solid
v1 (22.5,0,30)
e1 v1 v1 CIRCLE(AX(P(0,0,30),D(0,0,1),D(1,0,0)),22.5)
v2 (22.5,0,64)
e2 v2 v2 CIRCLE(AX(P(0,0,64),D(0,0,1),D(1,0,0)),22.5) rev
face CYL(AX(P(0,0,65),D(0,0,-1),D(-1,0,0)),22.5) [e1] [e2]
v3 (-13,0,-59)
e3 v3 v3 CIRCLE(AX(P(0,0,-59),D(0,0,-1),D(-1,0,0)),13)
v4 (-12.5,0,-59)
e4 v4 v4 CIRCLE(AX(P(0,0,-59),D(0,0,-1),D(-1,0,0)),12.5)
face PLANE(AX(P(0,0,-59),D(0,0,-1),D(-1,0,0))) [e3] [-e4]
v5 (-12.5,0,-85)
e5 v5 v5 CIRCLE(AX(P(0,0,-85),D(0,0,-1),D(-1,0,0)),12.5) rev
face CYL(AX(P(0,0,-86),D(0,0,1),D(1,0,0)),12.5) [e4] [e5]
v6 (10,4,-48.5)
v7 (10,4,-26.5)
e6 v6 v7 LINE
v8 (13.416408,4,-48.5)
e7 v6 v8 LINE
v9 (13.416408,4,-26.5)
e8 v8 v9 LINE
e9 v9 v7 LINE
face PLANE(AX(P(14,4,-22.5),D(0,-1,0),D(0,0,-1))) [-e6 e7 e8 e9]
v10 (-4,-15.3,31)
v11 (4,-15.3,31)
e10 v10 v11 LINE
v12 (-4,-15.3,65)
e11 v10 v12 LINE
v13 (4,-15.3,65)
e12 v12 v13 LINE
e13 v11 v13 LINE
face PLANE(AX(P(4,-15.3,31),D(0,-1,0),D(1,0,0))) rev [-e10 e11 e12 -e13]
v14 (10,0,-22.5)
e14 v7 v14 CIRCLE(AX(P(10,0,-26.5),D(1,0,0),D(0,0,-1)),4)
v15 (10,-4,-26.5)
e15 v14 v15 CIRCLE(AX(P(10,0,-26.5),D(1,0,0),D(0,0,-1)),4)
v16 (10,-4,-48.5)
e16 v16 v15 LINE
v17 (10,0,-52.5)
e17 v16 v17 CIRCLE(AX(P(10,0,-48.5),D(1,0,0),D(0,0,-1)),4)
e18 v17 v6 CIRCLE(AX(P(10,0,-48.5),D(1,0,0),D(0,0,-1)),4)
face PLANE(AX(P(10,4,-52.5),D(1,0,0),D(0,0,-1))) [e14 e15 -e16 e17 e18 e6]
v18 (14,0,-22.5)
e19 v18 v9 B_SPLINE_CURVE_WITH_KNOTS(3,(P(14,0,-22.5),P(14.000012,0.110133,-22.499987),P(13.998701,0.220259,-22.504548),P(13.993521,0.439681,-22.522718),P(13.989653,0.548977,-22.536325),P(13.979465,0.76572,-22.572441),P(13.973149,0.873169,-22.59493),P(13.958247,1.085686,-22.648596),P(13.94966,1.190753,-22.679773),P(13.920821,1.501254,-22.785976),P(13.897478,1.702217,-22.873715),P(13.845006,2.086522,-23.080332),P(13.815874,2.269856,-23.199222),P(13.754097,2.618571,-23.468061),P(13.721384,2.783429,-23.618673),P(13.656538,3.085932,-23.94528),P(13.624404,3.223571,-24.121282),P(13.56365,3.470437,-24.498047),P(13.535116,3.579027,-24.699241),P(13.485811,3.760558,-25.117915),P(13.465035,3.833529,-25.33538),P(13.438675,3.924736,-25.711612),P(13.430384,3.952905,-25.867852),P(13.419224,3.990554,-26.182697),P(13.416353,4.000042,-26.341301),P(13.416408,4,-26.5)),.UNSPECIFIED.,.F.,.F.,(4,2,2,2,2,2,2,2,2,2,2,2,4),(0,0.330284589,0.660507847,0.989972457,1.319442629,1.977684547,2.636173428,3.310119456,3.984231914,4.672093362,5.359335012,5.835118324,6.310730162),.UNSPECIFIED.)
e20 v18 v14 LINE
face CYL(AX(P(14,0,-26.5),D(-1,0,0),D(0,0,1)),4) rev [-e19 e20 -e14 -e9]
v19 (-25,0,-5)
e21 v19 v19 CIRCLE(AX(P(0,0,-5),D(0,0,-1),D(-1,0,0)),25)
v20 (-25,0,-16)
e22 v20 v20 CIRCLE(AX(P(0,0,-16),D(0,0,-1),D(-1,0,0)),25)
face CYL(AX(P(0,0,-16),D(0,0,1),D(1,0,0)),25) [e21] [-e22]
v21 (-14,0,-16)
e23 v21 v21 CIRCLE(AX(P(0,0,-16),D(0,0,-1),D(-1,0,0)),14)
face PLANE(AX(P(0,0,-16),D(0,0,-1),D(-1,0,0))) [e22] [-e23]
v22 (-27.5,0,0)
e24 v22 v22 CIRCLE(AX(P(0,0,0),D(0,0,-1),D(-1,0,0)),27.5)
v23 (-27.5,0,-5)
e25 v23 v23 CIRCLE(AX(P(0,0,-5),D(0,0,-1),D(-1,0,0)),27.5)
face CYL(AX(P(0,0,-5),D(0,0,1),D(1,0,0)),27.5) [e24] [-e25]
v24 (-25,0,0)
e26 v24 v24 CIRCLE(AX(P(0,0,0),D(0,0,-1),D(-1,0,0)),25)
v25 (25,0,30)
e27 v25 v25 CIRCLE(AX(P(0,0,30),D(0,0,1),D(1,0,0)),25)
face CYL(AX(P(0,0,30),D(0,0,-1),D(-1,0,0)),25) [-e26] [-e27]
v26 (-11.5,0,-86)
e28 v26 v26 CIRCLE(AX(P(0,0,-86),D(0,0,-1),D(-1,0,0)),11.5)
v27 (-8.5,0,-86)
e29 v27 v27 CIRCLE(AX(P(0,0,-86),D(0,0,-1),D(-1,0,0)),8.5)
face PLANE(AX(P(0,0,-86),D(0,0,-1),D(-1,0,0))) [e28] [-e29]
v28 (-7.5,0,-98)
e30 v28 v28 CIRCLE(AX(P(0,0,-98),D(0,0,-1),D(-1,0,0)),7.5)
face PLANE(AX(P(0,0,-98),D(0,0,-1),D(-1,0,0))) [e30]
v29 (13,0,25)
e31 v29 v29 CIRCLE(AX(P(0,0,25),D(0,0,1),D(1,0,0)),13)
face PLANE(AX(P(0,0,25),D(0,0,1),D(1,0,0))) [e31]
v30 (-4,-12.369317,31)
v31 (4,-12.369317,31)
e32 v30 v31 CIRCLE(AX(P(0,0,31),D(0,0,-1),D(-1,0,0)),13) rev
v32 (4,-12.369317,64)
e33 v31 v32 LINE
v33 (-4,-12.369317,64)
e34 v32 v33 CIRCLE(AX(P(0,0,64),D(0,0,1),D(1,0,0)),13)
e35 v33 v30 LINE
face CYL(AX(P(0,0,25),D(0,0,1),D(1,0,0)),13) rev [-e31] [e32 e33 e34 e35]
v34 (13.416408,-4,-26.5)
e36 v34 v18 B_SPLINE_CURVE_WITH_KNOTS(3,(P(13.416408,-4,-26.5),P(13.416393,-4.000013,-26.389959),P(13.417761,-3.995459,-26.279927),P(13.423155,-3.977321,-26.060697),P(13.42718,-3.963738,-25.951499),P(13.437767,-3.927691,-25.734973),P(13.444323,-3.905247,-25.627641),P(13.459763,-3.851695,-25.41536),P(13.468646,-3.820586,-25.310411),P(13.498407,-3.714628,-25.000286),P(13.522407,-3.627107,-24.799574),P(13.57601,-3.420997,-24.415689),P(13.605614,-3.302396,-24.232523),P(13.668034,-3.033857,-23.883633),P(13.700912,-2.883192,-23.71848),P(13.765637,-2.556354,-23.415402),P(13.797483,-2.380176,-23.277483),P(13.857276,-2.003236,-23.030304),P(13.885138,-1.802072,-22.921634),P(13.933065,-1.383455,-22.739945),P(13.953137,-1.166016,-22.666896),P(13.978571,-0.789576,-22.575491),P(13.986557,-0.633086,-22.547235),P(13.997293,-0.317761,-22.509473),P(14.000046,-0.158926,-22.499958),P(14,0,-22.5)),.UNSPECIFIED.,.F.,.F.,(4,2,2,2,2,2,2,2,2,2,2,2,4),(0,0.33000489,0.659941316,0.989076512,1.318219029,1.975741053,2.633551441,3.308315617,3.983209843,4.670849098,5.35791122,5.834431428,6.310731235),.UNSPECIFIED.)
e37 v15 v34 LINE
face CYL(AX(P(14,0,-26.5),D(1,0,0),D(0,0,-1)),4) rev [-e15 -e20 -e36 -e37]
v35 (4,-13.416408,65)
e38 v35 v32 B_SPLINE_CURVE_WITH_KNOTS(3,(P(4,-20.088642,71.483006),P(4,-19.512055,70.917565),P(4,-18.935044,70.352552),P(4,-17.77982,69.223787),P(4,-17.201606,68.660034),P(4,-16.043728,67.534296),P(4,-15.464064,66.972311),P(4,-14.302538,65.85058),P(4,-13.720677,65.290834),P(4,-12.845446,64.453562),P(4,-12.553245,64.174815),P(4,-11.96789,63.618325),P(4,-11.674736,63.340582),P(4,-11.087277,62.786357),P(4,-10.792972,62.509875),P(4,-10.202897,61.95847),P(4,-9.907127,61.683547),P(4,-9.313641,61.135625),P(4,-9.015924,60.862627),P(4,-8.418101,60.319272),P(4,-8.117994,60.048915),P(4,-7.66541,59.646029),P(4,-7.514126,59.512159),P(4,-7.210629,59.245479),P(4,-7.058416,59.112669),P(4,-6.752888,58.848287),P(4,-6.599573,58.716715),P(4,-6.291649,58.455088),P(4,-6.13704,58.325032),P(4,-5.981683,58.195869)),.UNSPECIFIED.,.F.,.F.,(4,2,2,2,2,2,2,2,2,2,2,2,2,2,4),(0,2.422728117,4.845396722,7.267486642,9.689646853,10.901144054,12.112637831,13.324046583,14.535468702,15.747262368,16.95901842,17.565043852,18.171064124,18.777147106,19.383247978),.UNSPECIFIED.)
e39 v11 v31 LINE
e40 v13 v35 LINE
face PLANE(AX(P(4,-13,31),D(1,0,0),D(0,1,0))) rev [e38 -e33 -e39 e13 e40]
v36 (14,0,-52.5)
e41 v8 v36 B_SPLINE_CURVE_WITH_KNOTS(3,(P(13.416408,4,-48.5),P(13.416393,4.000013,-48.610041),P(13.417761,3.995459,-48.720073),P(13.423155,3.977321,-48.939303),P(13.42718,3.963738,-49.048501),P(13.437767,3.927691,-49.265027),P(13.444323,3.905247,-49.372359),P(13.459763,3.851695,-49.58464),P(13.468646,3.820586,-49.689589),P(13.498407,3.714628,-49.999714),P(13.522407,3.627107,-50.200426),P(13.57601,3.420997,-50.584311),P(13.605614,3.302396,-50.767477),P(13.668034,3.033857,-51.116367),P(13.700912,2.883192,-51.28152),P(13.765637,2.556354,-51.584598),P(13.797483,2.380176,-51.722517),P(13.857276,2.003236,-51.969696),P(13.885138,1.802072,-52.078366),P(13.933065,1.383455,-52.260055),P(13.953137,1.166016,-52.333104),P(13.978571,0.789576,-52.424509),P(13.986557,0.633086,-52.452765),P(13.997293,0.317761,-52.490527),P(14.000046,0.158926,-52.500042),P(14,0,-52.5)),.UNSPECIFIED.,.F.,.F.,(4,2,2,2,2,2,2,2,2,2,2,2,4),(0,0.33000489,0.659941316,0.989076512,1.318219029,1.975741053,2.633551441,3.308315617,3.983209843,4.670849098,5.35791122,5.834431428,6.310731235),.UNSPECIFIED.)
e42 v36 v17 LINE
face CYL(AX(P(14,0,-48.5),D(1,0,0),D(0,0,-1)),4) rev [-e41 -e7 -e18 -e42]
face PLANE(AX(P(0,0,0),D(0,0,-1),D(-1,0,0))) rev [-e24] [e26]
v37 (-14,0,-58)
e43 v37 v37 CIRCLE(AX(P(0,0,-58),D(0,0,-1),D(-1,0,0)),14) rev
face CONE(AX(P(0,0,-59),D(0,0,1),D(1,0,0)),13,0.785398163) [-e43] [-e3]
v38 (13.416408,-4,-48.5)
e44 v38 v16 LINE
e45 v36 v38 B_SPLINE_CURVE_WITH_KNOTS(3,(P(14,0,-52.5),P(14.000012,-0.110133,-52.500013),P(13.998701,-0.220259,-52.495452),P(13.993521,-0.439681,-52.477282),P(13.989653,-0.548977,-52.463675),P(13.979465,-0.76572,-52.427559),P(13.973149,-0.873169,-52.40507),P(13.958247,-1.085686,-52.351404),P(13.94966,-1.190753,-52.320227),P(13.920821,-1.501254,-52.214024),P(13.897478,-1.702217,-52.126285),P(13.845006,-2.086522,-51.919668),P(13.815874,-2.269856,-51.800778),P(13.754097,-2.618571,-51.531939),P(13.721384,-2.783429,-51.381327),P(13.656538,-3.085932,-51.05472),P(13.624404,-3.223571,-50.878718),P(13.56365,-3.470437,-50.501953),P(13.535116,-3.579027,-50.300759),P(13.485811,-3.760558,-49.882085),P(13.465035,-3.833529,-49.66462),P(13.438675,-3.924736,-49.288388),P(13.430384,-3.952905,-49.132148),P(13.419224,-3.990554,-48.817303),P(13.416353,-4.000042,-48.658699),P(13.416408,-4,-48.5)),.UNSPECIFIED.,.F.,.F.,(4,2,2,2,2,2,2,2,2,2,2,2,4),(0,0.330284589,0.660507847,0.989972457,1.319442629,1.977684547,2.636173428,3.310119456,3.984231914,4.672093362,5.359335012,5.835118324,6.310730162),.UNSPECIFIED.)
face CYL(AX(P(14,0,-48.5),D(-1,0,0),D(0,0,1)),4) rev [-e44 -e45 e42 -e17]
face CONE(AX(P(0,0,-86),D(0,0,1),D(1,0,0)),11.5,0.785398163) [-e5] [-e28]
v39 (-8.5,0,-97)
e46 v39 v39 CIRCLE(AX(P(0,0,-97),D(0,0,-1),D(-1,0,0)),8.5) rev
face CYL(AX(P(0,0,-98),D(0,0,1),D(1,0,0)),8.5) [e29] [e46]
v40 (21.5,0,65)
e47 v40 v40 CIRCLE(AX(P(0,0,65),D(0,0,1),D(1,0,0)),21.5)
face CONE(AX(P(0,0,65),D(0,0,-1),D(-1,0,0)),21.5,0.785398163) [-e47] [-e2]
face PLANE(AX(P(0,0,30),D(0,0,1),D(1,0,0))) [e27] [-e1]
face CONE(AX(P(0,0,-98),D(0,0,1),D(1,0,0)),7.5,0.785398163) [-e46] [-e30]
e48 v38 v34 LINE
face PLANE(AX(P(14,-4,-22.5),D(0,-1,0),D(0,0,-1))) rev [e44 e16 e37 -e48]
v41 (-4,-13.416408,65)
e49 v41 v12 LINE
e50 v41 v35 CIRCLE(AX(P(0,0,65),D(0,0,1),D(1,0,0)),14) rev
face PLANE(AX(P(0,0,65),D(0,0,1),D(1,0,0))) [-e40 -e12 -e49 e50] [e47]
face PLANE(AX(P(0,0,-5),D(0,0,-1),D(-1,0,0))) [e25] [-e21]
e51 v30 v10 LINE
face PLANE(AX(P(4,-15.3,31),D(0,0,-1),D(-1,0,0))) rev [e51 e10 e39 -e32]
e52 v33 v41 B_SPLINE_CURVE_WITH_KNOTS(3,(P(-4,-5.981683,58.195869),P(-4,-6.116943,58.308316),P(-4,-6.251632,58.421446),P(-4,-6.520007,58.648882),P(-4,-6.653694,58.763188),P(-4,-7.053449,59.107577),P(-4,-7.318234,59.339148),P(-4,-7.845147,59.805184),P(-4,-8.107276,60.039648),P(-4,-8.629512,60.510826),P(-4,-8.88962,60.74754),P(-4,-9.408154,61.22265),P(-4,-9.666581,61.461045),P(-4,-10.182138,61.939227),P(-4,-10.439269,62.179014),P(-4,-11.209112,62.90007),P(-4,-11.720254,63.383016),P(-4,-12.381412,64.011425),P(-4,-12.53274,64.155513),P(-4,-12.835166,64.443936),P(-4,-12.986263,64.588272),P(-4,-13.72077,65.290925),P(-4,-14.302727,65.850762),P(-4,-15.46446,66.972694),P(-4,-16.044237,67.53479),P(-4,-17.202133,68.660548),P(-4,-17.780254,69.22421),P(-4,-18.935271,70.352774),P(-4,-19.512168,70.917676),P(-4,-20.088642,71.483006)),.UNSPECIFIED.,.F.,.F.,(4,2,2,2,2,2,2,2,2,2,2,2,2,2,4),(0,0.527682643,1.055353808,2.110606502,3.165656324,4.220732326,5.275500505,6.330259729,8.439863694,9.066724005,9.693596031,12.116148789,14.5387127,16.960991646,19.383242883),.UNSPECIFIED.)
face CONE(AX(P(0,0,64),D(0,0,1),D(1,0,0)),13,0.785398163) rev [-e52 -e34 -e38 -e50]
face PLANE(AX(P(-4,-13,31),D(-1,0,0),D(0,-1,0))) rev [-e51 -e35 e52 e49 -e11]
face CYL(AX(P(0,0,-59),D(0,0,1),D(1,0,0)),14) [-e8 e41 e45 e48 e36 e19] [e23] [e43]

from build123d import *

# Parameters (mm, degrees)
SKETCH_1_R               = 25
EXTRUDE_1_DEPTH          = 30
SKETCH_2_R               = 27.5
EXTRUDE_2_DEPTH          = 5
EXTRUDE_START            = 11
SKETCH_3_R               = 25
EXTRUDE_3_DEPTH          = 11
SKETCH_4_R               = 14
EXTRUDE_4_DEPTH          = 43
SKETCH_5_R               = 12.5
EXTRUDE_5_DEPTH          = 27
SKETCH_6_R               = 8.5
EXTRUDE_6_DEPTH          = 12
CUT_EXTRUDE_1_DEPTH      = 4
CUT_EXTRUDE_1_DEPTH_BACK = 4
SKETCH_7_W               = 4
SKETCH_7_H               = 30
FILLET_1_R               = 4
CHAMFER_1_SIZE           = 1
SKETCH_8_R               = 22.5
EXTRUDE_7_DEPTH          = 35
CHAMFER_2_SIZE           = 1
SKETCH_9_R               = 13
CUT_EXTRUDE_2_DEPTH      = 40
CHAMFER_3_SIZE           = 1
CUT_EXTRUDE_3_DEPTH      = 34


with BuildPart() as part:
    # 草图1 → 凸台-拉伸1 (new body)
    with BuildSketch(Plane.XY):
        Circle(SKETCH_1_R)
    extrude(amount=EXTRUDE_1_DEPTH)

    # 草图2 → 凸台-拉伸2 (add)
    with BuildSketch(Plane(origin=(0, 0, 0), x_dir=(-1, 0, 0), z_dir=(0, 0, -1))):
        Circle(SKETCH_2_R)
    extrude(amount=EXTRUDE_2_DEPTH)

    # 草图3 → 凸台-拉伸3 (add)
    with BuildSketch(Plane(origin=(0, 0, -5), x_dir=(-1, 0, 0), z_dir=(0, 0, -1)).offset(EXTRUDE_START)):
        Circle(SKETCH_3_R)
    extrude(amount=-EXTRUDE_3_DEPTH)

    # 草图4 → 凸台-拉伸4 (add)
    with BuildSketch(Plane(origin=(0, 0, -16), x_dir=(-1, 0, 0), z_dir=(0, 0, -1))):
        Circle(SKETCH_4_R)
    extrude(amount=EXTRUDE_4_DEPTH)

    # 草图5 → 凸台-拉伸5 (add)
    with BuildSketch(Plane(origin=(0, 0, -59), x_dir=(-1, 0, 0), z_dir=(0, 0, -1))):
        Circle(SKETCH_5_R)
    extrude(amount=EXTRUDE_5_DEPTH)

    # 草图6 → 凸台-拉伸6 (add)
    with BuildSketch(Plane(origin=(0, 0, -86), x_dir=(-1, 0, 0), z_dir=(0, 0, -1))):
        Circle(SKETCH_6_R)
    extrude(amount=EXTRUDE_6_DEPTH)

    # 草图7 → 切除-拉伸1 (cut, two sides: drawn at the far end of the back side and taken through both)
    with BuildSketch(Plane(origin=(0, 0, 0), x_dir=(1, 0, 0), z_dir=(0, 1, 0)).offset(-CUT_EXTRUDE_1_DEPTH_BACK)):
        with Locations((12, 37.5)):
            Rectangle(SKETCH_7_W, SKETCH_7_H)
    extrude(amount=CUT_EXTRUDE_1_DEPTH + CUT_EXTRUDE_1_DEPTH_BACK, mode=Mode.SUBTRACT)

    # 圆角1
    fillet_1_edges = [part.edges().sort_by_distance(p)[0] for p in [
        (11.708203932, 4, -22.5),
        (11.708203932, -4, -22.5),
        (11.708203932, -4, -52.5),
        (11.708203932, 4, -52.5),
    ]]
    fillet(fillet_1_edges, radius=FILLET_1_R - 0.0001)  # a hair under: the kernel refuses the full size

    # 倒角1
    chamfer_1_edges = [part.edges().sort_by_distance(p)[0] for p in [
        (14, 0, -59),
        (12.5, 0, -86),
        (8.5, 0, -98),
    ]]
    chamfer(chamfer_1_edges, length=CHAMFER_1_SIZE)

    # 草图8 → 凸台-拉伸7 (add)
    with BuildSketch(Plane.XY.offset(30)):
        Circle(SKETCH_8_R)
    extrude(amount=EXTRUDE_7_DEPTH)

    # 倒角2
    chamfer_2_edges = [part.edges().sort_by_distance(p)[0] for p in [
        (-22.5, 0, 65),
    ]]
    chamfer(chamfer_2_edges, length=CHAMFER_2_SIZE)

    # 草图9 → 切除-拉伸2 (cut)
    with BuildSketch(Plane.XY.offset(65)):
        Circle(SKETCH_9_R)
    extrude(amount=-CUT_EXTRUDE_2_DEPTH, mode=Mode.SUBTRACT)

    # 倒角3
    chamfer_3_edges = [part.edges().sort_by_distance(p)[0] for p in [
        (-13, 0, 65),
    ]]
    chamfer(chamfer_3_edges, length=CHAMFER_3_SIZE)

    # 草图10 → 切除-拉伸3 (cut)
    with BuildSketch(Plane.XY.offset(65)):
        Polygon((-4, -13), (-4, -8.881570562), (4, -8.881570562), (4, -13), (4, -15.3), (-4, -15.3), align=None)
    extrude(amount=-CUT_EXTRUDE_3_DEPTH, mode=Mode.SUBTRACT)


solid = part.part
